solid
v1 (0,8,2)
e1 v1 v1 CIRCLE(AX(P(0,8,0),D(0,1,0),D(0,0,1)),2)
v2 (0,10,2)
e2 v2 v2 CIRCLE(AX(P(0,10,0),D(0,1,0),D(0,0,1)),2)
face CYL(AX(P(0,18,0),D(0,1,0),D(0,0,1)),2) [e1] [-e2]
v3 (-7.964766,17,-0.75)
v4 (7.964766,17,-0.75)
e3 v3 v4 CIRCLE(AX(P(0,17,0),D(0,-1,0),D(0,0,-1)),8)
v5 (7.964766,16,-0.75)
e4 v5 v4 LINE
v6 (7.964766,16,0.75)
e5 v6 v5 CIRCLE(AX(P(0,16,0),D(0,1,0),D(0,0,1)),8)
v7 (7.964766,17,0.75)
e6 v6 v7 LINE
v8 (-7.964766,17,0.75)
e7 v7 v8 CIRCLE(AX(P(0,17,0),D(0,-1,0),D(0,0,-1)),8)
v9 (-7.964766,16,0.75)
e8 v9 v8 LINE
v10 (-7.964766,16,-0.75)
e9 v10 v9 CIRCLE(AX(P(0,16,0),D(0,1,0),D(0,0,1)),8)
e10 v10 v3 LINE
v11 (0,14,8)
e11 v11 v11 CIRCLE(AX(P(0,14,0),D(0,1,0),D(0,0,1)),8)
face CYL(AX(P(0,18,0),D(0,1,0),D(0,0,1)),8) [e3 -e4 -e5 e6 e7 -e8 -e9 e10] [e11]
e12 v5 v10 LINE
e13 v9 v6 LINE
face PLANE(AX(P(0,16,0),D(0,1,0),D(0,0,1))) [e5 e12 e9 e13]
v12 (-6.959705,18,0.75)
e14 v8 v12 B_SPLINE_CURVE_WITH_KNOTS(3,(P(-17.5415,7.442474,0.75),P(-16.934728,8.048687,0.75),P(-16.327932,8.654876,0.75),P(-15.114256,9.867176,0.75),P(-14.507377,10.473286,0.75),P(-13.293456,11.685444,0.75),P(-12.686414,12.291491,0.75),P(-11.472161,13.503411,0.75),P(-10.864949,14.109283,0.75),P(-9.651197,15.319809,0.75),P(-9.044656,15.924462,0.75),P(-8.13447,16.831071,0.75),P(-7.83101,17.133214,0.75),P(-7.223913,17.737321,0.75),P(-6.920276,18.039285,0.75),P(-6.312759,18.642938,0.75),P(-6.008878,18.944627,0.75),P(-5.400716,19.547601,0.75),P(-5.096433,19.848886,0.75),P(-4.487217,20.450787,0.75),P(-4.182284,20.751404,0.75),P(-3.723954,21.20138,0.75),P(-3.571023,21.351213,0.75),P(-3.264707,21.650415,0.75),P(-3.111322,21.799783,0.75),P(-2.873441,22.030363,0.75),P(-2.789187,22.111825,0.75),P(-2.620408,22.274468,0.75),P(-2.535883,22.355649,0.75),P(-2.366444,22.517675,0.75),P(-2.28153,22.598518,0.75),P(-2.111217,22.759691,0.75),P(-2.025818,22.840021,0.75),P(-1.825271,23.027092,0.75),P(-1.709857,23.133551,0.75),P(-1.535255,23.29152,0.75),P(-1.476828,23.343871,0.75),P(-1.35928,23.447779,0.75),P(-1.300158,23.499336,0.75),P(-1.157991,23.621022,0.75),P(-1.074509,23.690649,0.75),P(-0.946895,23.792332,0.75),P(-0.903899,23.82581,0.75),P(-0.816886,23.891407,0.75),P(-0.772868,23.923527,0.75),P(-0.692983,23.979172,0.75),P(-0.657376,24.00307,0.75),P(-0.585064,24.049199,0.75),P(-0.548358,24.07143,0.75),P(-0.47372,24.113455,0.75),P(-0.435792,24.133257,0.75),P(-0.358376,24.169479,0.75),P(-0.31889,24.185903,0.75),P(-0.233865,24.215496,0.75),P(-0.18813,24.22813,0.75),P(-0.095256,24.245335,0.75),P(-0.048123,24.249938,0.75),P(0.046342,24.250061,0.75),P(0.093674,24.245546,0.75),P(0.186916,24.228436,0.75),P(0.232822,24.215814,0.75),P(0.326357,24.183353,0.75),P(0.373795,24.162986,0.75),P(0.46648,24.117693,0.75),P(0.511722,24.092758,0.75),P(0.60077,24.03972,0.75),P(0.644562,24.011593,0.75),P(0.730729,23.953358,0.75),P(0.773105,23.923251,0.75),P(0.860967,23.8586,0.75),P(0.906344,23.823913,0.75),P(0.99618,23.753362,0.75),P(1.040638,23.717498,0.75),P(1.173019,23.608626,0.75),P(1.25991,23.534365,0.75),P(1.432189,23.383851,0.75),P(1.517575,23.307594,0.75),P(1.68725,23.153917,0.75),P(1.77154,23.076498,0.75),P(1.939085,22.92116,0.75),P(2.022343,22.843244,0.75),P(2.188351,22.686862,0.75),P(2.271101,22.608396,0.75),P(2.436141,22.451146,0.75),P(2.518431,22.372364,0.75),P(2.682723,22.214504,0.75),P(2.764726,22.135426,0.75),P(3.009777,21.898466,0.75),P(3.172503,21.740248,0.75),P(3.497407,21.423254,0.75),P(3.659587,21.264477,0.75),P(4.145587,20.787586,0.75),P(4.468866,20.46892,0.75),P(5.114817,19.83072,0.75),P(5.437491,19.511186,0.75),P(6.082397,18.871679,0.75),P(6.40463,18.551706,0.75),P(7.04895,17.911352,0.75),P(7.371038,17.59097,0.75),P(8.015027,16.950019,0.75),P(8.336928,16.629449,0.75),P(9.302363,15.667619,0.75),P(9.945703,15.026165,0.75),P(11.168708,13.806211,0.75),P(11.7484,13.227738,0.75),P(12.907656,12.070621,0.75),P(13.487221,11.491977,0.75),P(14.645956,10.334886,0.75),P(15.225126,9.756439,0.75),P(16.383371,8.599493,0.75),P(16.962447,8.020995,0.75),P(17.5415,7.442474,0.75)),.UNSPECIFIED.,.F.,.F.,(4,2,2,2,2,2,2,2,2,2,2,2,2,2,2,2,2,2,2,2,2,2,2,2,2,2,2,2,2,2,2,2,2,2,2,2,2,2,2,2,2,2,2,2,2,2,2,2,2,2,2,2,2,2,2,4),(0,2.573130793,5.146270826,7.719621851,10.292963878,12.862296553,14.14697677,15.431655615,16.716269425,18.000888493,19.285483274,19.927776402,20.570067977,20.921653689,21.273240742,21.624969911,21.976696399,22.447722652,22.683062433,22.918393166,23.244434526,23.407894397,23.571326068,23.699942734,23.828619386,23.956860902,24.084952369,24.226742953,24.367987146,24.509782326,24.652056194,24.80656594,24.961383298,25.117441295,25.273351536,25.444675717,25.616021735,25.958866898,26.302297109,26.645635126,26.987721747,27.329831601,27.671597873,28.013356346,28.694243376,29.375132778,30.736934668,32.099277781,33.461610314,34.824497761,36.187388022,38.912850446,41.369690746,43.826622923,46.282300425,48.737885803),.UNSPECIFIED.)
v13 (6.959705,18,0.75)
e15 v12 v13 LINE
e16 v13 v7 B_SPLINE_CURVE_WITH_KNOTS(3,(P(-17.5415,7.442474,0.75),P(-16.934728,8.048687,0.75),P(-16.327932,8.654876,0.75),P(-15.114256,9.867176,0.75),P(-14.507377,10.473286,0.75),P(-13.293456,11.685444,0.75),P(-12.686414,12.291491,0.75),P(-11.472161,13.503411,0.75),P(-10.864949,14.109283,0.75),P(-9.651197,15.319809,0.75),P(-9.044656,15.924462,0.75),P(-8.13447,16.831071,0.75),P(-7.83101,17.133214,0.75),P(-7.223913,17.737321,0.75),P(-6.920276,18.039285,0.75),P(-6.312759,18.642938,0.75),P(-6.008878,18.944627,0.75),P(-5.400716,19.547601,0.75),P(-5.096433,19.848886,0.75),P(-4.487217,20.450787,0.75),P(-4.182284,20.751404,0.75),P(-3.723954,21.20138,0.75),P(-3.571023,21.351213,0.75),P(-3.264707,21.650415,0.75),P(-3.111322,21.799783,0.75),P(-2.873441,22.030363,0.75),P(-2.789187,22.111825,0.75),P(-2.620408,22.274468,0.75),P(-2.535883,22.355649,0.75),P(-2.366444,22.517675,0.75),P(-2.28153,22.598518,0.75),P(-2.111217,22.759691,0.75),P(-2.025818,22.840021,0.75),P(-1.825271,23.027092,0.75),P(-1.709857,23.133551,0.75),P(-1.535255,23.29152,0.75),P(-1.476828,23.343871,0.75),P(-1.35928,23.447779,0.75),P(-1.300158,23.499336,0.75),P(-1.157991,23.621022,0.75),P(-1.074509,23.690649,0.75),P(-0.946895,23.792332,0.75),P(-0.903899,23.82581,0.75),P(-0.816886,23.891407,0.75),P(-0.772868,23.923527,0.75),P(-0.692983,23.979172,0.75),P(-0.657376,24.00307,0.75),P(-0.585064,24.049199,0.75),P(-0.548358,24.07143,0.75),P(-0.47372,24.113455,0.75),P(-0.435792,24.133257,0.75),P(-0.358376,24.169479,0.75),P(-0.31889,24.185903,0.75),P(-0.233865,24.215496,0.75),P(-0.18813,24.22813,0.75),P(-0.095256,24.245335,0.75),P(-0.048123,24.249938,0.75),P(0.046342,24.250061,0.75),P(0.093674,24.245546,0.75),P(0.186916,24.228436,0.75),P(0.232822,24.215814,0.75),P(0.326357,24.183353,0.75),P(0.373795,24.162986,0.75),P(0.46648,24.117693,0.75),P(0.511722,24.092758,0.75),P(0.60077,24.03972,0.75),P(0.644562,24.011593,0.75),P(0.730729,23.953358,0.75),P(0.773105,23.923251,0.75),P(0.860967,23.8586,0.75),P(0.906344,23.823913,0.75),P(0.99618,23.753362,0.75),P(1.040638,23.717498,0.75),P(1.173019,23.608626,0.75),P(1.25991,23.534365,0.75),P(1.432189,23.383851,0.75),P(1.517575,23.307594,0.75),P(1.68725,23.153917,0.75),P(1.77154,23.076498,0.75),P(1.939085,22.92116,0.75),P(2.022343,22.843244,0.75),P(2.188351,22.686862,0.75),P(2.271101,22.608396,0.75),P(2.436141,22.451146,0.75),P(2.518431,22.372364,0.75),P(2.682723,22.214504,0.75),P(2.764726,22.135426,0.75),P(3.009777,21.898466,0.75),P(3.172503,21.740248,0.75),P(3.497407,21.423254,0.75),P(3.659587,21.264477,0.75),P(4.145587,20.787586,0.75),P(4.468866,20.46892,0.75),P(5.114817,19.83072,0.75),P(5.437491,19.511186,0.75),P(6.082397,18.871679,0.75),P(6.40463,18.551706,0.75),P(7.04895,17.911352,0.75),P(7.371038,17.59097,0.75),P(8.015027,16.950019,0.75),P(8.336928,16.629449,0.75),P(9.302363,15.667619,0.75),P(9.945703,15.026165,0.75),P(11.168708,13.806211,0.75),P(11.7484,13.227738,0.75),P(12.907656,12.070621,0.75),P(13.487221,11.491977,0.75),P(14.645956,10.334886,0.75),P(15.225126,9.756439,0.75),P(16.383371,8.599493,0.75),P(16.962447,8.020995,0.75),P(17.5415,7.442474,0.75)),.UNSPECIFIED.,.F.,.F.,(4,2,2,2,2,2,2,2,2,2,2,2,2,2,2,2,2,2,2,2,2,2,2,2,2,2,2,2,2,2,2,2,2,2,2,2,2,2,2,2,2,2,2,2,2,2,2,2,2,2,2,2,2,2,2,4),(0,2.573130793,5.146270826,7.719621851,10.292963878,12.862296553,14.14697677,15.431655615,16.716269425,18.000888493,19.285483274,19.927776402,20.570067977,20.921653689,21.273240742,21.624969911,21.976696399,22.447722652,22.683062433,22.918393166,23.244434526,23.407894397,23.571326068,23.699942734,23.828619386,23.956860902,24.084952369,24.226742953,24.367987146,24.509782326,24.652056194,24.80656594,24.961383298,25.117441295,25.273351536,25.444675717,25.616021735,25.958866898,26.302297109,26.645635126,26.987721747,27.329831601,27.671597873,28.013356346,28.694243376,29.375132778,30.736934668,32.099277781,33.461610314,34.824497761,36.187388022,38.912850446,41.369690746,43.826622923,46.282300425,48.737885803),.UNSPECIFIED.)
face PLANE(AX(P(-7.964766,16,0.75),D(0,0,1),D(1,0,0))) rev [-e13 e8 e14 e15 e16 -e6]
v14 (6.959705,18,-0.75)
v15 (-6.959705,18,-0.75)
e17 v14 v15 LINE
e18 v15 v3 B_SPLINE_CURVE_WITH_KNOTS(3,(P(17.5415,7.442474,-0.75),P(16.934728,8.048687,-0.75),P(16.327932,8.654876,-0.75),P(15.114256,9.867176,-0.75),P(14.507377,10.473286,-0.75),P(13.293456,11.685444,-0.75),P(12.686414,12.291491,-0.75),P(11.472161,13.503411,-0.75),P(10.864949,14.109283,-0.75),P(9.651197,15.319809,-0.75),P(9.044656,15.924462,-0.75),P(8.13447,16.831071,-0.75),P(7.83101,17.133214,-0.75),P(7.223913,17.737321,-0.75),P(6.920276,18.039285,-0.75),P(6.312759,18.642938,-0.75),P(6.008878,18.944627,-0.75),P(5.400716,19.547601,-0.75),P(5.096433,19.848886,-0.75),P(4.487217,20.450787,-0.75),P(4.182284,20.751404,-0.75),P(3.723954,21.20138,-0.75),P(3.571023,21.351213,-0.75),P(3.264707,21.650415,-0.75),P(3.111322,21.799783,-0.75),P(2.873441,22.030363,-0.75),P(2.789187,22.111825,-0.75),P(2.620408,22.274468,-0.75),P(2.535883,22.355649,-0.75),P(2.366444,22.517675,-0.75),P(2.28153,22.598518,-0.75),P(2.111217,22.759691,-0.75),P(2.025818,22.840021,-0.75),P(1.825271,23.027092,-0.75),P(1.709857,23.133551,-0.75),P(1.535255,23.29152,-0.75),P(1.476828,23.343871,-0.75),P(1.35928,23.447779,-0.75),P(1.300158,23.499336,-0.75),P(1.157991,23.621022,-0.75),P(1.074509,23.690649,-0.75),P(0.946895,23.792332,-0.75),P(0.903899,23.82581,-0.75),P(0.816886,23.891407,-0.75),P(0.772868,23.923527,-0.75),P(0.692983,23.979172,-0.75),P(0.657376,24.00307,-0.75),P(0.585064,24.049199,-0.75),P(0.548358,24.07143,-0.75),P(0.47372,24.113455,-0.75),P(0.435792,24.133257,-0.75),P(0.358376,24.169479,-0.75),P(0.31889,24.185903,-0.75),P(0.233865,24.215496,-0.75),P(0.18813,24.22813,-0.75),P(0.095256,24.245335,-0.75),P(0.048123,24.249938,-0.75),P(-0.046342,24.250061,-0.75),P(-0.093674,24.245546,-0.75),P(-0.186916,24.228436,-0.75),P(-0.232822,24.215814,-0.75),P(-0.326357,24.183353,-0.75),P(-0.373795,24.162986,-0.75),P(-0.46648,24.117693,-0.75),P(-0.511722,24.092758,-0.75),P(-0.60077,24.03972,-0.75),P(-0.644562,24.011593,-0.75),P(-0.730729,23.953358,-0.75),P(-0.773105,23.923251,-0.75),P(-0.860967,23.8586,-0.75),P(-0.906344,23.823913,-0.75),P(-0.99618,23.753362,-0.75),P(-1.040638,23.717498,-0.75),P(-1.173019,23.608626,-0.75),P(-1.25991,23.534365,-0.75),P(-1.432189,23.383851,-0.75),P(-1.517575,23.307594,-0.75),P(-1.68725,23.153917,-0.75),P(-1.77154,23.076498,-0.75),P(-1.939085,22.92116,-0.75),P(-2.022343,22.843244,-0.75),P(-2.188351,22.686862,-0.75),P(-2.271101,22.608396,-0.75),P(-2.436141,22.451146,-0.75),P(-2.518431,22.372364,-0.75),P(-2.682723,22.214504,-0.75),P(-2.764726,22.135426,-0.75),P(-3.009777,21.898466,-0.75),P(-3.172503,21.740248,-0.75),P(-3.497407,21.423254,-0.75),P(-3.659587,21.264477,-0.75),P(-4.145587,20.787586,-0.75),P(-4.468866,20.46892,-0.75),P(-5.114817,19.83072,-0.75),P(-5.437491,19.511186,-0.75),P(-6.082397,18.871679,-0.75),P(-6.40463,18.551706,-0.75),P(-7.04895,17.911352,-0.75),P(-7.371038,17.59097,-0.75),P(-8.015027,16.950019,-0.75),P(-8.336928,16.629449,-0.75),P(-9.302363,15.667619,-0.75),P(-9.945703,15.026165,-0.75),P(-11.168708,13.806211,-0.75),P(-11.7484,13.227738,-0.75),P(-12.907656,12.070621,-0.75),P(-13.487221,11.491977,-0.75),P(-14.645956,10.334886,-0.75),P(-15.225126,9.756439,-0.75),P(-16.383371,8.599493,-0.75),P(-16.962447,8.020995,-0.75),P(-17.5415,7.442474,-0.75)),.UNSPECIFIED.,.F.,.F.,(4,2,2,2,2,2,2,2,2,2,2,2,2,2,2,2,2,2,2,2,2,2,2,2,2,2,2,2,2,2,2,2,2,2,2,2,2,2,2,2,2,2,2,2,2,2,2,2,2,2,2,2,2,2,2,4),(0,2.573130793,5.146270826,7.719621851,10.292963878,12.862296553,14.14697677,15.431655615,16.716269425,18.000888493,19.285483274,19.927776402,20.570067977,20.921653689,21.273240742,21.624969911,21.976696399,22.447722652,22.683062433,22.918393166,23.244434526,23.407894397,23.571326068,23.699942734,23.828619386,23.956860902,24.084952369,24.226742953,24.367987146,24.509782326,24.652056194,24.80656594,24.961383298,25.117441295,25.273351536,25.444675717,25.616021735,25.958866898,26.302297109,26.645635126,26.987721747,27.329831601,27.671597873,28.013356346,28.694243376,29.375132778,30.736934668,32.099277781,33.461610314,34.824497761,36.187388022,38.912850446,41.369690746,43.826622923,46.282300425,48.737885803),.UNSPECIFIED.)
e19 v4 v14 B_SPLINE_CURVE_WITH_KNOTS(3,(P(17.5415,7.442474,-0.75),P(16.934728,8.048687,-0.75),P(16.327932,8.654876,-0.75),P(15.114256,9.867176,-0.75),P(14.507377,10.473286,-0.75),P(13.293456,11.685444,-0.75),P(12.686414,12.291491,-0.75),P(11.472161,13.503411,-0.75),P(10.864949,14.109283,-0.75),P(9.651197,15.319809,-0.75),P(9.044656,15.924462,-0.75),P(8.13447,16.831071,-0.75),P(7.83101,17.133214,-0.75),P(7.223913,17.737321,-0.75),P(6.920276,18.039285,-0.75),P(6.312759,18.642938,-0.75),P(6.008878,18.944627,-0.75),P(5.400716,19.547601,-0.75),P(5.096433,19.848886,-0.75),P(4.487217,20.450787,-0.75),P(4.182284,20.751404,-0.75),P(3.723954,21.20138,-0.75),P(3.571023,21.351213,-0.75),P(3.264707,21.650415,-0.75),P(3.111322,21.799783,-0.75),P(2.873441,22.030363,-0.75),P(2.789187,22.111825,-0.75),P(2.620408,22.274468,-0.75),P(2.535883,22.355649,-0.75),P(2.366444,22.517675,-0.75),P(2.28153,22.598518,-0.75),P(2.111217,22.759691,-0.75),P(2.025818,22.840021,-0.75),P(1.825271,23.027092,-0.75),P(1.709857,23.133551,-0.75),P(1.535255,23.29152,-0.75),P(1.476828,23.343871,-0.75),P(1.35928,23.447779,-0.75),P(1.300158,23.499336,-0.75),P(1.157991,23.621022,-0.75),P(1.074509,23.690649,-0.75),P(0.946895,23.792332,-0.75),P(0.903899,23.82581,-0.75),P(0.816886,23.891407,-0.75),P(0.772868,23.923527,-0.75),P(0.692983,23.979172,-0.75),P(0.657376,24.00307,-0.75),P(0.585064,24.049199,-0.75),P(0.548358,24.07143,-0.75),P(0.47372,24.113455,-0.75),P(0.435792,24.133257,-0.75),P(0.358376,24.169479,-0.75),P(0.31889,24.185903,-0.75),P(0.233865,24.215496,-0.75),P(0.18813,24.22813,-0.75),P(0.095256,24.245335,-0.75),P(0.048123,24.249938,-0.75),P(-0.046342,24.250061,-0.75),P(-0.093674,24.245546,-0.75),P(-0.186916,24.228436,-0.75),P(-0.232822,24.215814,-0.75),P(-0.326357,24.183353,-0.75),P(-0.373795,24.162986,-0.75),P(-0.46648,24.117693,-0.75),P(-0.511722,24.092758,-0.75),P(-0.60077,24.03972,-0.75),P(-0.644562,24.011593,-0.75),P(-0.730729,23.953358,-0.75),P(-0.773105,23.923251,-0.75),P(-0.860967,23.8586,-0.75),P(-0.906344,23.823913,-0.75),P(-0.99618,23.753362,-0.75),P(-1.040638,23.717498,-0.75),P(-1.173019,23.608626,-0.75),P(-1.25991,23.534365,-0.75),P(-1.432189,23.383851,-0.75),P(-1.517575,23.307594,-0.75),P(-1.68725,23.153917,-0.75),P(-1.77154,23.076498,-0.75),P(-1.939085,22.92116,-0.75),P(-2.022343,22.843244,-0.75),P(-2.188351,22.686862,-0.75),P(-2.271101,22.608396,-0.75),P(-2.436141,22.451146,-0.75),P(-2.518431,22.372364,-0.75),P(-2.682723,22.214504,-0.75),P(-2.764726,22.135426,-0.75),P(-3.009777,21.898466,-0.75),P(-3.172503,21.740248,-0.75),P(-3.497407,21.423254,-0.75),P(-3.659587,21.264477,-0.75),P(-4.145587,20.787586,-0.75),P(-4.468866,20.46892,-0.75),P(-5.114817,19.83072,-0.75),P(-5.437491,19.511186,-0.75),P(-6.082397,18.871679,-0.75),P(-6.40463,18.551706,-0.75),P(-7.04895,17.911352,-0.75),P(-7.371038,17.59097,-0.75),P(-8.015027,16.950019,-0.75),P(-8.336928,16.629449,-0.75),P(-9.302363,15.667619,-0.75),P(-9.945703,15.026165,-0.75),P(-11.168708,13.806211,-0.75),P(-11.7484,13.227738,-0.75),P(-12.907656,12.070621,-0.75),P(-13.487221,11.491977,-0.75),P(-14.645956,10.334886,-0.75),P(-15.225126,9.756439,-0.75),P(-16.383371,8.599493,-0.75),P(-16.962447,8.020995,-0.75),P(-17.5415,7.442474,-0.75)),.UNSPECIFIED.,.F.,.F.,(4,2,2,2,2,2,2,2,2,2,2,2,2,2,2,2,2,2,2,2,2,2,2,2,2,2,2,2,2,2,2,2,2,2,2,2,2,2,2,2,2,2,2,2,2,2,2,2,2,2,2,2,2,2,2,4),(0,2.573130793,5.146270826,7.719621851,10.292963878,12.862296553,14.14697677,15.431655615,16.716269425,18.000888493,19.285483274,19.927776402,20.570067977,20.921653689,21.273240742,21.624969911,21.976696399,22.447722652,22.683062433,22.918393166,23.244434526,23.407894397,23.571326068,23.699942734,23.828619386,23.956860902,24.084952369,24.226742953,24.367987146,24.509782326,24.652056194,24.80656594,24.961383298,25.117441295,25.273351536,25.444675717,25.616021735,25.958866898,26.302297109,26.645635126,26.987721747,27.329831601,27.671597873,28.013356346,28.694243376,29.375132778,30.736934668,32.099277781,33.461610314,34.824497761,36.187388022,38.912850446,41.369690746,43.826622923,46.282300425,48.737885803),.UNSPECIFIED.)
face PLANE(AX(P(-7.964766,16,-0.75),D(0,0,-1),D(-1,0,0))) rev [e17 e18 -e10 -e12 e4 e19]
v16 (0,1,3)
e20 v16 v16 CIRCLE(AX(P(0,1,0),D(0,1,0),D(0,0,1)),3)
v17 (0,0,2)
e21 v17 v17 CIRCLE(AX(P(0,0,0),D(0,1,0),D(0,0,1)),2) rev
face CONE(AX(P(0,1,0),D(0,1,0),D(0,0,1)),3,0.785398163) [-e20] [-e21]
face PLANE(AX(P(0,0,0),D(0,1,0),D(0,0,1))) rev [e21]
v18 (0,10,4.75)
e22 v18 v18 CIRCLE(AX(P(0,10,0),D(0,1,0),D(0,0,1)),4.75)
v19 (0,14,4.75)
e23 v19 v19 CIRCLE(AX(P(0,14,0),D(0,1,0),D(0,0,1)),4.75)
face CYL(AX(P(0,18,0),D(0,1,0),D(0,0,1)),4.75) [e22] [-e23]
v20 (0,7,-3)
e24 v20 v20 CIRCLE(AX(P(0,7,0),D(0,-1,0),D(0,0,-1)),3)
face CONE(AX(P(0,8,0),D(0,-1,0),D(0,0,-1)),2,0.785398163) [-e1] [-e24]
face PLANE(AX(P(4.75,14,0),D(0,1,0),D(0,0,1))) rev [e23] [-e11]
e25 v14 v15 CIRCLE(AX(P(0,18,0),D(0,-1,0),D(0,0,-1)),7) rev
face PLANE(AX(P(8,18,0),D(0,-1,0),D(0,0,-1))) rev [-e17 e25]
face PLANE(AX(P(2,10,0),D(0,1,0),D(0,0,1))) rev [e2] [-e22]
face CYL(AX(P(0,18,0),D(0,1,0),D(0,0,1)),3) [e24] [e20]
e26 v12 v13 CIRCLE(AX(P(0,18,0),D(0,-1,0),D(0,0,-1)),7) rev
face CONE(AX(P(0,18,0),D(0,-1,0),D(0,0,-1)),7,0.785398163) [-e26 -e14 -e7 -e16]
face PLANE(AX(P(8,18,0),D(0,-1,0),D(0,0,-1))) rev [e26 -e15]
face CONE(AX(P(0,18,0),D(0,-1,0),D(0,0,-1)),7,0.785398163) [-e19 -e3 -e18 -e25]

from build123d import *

# Parameters (mm, degrees)
CHAMFER_2_SIZE      = 1
CUT_EXTRUDE_1_DEPTH = 2


with BuildPart() as part:
    # 草图1 → 旋转1 (revolve)
    with BuildSketch(Plane.XY, mode=Mode.PRIVATE) as revolve_1_sk:
        Polygon((0, 0), (3, 0), (3, 8), (2, 8), (2, 10), (4.75, 10), (4.75, 14), (8, 14), (8, 18), (0, 18), align=None)
    revolve(revolve_1_sk.sketch.rotate(Axis((0, 18, 0), (0, -1, 0)), 90), axis=Axis((0, 18, 0), (0, -1, 0)))

    # 倒角2
    chamfer_2_edges = [part.edges().sort_by_distance(p)[0] for p in [
        (0, 8, -3),
        (0, 0, -3),
        (0, 18, -8),
    ]]
    chamfer(chamfer_2_edges, length=CHAMFER_2_SIZE - 0.0001)  # a hair under: the kernel refuses the full size

    # 草图2 → 切除-拉伸1 (cut)
    with BuildSketch(Plane(origin=(0, 18, 0), x_dir=(1, 0, 0), z_dir=(0, 1, 0))):
        with BuildLine():
            Line((-7.964766161, -0.75), (7.964766161, -0.75))
            ThreePointArc((7.964766161, -0.75), (8, 0), (7.964766161, 0.75))
            Line((7.964766161, 0.75), (-7.964766161, 0.75))
            ThreePointArc((-7.964766161, 0.75), (-8, 0), (-7.964766161, -0.75))
        make_face()
    extrude(amount=-CUT_EXTRUDE_1_DEPTH, mode=Mode.SUBTRACT)


solid = part.part
